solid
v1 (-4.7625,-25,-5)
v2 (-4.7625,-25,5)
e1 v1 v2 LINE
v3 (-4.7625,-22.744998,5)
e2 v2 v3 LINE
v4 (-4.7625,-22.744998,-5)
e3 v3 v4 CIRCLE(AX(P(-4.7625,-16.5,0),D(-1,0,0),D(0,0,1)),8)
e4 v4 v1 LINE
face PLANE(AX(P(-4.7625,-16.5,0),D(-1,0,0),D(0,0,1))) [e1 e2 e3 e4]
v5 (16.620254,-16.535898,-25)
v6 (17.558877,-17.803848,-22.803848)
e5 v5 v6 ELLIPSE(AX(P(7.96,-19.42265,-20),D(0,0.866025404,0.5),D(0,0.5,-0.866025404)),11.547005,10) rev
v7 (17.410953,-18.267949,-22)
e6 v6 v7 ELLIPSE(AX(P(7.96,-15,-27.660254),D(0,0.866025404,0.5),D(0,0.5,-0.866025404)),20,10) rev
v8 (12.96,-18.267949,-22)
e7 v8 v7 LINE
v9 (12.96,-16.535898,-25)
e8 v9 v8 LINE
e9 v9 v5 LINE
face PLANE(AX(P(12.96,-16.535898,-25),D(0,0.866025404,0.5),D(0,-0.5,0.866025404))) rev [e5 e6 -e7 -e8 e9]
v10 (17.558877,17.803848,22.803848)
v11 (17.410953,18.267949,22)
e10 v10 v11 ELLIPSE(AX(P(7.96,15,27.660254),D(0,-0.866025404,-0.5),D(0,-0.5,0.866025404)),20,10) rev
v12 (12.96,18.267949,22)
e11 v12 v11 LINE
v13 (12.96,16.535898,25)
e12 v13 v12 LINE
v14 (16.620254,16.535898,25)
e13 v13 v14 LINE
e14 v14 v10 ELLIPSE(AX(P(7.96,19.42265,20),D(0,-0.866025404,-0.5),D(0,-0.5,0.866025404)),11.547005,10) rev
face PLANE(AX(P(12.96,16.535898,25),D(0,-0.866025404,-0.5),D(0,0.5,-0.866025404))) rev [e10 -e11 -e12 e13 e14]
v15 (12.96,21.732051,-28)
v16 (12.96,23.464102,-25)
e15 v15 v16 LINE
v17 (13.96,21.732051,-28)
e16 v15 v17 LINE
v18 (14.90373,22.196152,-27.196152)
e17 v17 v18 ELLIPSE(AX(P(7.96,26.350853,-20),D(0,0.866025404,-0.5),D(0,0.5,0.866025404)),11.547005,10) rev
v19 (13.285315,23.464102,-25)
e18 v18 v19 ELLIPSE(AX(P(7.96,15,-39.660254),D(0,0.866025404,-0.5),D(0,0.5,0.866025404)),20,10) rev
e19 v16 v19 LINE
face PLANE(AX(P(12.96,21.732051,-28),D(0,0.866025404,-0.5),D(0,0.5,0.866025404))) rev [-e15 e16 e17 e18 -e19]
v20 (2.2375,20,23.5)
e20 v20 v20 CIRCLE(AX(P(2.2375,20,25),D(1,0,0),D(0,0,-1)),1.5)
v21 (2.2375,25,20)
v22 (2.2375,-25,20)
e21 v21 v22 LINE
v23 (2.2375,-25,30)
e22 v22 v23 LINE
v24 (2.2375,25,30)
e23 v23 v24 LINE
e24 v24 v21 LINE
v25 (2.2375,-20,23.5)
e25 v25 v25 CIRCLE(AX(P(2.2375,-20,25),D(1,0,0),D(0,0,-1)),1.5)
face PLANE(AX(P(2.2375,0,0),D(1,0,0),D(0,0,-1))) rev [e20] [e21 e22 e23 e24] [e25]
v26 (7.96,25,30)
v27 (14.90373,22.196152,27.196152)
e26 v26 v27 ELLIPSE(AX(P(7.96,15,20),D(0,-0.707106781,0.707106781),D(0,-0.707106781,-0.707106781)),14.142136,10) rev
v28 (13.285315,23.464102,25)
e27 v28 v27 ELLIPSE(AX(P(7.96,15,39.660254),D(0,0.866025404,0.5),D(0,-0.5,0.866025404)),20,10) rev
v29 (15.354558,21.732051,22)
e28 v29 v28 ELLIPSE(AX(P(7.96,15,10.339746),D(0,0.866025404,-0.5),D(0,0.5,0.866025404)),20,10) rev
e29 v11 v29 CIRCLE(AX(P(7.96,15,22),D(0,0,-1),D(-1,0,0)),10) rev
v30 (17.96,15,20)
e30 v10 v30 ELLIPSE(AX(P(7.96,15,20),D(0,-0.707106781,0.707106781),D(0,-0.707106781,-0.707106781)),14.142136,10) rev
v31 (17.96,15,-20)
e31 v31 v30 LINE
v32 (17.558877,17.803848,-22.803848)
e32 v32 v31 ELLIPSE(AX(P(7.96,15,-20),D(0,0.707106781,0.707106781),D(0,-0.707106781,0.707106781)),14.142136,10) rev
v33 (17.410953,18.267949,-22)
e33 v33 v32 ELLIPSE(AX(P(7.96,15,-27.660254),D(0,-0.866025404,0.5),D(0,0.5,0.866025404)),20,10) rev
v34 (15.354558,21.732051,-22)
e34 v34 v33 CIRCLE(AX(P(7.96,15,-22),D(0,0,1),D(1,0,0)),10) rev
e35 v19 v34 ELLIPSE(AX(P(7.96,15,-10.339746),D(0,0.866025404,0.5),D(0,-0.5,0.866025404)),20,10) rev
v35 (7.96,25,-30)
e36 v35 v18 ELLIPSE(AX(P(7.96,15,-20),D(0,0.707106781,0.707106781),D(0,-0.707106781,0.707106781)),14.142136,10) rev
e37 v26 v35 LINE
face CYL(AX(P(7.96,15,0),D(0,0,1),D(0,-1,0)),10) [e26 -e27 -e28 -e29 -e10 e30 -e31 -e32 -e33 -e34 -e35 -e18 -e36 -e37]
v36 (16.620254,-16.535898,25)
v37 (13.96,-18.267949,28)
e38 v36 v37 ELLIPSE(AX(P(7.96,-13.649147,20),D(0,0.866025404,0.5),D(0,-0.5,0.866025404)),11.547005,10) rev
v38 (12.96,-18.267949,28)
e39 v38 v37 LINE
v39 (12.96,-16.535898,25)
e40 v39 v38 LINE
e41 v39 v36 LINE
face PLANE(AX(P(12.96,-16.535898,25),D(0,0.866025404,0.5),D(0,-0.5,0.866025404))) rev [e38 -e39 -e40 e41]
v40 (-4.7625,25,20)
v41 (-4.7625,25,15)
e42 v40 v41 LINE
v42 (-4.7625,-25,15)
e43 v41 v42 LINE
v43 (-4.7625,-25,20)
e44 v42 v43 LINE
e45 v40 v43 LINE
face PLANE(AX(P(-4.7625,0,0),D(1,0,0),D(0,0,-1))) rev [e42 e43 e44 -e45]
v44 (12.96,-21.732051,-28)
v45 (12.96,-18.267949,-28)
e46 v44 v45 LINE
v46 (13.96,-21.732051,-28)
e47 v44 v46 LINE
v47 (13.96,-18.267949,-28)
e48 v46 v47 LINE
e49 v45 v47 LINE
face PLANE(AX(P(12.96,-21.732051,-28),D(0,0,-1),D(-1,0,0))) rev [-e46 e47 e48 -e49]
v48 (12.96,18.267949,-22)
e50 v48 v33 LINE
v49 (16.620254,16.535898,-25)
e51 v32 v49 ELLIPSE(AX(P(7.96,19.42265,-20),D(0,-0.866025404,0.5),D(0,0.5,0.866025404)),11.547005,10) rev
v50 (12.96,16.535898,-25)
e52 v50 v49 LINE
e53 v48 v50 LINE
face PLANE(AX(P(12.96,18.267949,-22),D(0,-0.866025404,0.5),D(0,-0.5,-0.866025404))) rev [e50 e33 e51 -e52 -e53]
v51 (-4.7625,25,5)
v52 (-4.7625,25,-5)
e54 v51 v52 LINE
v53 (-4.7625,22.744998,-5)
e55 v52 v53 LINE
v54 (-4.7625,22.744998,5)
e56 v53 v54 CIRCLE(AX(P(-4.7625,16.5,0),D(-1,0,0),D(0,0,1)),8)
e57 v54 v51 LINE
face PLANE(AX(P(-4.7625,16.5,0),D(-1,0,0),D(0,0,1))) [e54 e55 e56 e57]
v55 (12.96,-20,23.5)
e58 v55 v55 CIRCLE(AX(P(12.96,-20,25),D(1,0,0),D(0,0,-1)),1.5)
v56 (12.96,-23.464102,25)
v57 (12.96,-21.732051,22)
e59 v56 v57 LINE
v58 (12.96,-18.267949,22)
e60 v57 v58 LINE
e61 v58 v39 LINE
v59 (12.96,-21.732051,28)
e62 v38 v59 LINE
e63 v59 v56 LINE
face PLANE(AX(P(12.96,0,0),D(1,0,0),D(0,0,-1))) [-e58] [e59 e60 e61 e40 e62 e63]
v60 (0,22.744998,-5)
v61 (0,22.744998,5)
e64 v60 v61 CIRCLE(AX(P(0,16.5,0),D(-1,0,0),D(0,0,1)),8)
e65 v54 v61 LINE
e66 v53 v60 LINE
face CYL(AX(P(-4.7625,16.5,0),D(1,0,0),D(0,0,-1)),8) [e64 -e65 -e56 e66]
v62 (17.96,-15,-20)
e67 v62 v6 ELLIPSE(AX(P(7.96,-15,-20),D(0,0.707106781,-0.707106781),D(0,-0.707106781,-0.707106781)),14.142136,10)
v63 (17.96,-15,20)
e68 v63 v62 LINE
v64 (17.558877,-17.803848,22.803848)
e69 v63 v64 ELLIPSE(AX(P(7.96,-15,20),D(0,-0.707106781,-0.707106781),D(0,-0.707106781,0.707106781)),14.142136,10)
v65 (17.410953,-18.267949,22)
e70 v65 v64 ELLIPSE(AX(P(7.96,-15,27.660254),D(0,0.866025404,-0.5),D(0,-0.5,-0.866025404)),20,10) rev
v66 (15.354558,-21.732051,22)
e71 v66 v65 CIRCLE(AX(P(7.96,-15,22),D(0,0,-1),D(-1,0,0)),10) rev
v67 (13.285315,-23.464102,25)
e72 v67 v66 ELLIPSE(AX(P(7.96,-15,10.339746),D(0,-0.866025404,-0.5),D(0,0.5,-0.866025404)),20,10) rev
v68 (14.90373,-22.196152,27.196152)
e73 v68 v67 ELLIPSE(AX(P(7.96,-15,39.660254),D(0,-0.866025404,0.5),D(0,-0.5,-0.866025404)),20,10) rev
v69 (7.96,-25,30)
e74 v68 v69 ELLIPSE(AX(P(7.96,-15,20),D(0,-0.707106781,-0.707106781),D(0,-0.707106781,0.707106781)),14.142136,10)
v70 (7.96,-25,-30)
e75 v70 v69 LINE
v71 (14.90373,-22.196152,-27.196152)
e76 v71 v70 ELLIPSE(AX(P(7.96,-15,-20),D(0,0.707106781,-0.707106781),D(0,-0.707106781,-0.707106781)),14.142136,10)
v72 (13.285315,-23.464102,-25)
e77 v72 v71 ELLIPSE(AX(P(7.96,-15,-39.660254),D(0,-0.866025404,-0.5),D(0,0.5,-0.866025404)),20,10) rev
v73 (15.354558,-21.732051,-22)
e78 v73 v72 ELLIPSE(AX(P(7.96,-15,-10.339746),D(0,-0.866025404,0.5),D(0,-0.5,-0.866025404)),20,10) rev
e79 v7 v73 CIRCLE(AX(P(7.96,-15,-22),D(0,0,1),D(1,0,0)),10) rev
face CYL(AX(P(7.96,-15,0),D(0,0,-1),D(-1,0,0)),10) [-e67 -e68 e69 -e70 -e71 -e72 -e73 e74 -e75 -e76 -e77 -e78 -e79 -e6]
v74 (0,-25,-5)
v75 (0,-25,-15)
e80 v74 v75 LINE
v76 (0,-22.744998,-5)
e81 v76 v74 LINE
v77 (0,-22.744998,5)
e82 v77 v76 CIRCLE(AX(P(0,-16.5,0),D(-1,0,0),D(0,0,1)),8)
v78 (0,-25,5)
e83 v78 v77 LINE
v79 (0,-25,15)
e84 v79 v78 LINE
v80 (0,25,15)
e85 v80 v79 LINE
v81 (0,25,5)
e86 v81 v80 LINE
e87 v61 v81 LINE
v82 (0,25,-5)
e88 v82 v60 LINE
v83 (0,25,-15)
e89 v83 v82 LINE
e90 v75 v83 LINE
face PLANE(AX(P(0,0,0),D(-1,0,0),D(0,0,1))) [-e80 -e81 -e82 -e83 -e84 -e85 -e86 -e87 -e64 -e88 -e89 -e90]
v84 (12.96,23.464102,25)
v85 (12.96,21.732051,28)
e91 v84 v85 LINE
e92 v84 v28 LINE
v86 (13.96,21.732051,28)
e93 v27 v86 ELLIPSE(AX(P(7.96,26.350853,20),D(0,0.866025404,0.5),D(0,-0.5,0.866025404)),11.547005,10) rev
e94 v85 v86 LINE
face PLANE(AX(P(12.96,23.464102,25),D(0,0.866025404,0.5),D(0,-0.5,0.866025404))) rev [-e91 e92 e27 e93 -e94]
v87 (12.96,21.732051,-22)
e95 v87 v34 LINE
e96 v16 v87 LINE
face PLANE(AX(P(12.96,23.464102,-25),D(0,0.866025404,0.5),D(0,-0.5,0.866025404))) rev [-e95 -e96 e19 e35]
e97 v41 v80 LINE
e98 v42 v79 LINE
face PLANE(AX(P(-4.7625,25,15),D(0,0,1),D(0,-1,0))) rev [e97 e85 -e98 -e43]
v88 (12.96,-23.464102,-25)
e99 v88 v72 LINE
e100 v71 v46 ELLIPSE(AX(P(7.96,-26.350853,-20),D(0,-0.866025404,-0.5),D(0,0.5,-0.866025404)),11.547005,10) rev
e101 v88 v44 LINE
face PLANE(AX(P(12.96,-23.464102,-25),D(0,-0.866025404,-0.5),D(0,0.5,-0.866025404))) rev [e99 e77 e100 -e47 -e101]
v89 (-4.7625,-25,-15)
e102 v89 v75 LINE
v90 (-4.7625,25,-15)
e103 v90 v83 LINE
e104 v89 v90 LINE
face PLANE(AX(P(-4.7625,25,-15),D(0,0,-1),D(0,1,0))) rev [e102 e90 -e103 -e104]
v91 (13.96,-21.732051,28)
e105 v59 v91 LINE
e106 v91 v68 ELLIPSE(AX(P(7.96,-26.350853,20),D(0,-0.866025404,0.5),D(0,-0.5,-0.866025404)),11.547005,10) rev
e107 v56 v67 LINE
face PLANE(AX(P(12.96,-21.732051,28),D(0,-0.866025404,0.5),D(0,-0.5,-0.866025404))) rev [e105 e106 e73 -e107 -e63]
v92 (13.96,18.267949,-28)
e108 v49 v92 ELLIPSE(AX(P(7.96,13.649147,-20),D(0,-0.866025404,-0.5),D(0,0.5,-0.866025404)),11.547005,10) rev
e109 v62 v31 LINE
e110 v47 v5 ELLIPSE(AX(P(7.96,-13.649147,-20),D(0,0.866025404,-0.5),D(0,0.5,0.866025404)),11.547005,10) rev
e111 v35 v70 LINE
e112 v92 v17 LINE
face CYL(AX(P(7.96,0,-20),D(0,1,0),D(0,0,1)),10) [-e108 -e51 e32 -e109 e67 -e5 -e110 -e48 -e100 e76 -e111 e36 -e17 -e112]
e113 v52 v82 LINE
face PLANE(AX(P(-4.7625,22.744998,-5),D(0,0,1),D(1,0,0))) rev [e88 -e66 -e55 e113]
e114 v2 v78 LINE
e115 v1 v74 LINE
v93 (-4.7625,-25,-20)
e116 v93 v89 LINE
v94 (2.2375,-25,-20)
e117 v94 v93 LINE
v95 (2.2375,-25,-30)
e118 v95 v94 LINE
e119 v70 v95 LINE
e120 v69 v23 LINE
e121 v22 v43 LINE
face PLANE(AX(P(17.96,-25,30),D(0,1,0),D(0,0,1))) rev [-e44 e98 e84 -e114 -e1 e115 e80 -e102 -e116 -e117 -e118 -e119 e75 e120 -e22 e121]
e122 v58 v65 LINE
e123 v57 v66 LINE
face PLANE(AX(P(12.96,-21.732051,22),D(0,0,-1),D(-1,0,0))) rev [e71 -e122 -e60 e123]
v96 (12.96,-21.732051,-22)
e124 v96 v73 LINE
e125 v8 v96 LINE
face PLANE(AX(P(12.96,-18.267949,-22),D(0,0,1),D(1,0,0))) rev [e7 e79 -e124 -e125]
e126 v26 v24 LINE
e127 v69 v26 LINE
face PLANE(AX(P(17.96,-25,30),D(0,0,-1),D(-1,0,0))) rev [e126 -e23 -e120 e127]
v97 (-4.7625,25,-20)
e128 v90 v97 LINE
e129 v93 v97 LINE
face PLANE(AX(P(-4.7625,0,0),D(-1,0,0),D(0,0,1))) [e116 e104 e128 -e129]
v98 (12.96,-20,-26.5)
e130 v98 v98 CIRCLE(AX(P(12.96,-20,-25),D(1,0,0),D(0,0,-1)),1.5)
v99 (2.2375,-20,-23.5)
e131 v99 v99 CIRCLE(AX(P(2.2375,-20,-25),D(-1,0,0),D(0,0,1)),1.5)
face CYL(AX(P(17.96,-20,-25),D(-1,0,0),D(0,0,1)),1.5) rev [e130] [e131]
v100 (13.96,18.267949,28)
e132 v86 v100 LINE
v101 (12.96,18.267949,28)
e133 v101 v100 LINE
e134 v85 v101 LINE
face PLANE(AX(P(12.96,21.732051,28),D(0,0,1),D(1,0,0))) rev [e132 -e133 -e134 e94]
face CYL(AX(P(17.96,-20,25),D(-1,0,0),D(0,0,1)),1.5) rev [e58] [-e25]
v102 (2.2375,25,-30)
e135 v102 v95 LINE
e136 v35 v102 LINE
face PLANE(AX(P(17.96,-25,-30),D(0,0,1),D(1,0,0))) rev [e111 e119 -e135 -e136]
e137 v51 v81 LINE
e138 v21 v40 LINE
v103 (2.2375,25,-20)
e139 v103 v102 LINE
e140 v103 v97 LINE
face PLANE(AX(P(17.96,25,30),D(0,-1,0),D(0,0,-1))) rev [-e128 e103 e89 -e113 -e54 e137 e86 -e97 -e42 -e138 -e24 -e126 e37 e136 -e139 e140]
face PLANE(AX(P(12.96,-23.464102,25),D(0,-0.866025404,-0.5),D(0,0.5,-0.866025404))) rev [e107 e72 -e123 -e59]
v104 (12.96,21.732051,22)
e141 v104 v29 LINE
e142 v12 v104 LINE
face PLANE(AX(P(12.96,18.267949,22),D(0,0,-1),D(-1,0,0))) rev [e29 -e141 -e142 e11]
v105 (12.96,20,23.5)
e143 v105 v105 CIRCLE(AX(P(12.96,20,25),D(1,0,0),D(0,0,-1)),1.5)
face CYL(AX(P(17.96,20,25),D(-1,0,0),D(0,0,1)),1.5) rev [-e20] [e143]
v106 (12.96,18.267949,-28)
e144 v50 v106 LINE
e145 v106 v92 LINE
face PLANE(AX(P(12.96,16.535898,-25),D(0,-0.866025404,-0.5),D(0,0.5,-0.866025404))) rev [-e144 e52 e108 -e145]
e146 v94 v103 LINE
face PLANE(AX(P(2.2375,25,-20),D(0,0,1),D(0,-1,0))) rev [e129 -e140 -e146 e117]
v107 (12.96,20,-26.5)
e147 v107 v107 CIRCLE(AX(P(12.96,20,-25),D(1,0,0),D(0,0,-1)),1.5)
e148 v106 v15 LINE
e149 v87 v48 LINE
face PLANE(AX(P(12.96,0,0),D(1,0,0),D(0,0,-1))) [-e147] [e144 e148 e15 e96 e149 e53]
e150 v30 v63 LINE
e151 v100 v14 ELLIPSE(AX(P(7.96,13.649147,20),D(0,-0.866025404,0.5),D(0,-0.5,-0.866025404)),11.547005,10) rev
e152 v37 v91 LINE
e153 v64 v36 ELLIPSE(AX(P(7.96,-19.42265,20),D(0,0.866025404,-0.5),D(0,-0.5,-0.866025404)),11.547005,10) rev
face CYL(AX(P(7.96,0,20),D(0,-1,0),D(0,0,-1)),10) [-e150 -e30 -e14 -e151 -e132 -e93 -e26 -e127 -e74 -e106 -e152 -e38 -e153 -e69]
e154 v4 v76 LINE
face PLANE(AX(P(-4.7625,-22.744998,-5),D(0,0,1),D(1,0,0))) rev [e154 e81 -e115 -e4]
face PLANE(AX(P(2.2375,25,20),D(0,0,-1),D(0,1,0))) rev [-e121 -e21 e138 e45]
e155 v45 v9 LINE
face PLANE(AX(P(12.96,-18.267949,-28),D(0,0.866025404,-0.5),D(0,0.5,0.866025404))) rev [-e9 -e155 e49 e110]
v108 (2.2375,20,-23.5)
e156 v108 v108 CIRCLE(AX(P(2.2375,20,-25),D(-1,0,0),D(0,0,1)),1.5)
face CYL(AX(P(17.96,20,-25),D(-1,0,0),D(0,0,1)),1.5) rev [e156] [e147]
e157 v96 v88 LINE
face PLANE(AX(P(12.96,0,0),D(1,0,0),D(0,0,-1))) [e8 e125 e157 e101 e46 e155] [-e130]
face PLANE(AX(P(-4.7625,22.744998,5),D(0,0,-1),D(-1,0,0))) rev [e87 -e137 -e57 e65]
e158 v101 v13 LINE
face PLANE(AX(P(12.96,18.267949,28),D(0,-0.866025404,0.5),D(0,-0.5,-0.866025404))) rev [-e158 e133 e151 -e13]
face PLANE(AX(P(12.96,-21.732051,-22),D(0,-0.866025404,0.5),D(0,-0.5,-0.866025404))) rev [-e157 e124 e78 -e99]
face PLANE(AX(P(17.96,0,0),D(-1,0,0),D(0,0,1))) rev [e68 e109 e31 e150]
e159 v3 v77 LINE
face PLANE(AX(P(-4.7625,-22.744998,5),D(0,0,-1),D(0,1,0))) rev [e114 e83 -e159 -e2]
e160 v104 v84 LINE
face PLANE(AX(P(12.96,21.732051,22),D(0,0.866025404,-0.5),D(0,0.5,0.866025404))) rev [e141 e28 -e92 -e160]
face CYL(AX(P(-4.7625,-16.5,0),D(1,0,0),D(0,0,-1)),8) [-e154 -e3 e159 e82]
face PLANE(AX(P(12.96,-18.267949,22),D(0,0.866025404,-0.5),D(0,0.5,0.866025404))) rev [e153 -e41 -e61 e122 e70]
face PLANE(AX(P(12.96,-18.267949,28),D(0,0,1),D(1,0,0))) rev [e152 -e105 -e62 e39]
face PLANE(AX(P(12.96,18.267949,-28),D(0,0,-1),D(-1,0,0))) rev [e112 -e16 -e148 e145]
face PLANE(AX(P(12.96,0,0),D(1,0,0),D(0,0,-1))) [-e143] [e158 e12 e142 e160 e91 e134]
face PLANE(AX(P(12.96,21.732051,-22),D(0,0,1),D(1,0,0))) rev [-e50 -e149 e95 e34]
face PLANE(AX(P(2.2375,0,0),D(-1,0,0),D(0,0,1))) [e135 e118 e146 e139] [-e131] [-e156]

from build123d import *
from build123d.topology import SkipClean

# Parameters (mm, degrees)
CROQUIS1_W              = 60
CROQUIS1_H              = 50
CROQUIS1_R              = 1.5
SALIENTE_EXTRUIR1_DEPTH = 17.96
SALIENTE_EXTRUIR2_START = 4.7625
CROQUIS3_W              = 15
CROQUIS3_H              = 50
CROQUIS3_R              = 1.5
SALIENTE_EXTRUIR2_DEPTH = 4.7625
SALIENTE_EXTRUIR3_DEPTH = 4.7625
REDONDEO2_R             = 10
CORTAR_EXTRUIR1_DEPTH   = 5
CROQUIS6_W              = 10
CROQUIS6_H              = 50
CORTAR_EXTRUIR2_DEPTH   = 7


with BuildPart() as part:
    # Croquis1 → Saliente-Extruir1 (new body)
    with BuildSketch(Plane(origin=(0, 0, 0), x_dir=(0, 0, -1), z_dir=(1, 0, 0))):
        Rectangle(CROQUIS1_W, CROQUIS1_H)
        with Locations((-25, 20)):
            Circle(CROQUIS1_R, mode=Mode.SUBTRACT)
        with Locations(Location((25, 20, 0), (0, 0, 180))):
            Circle(CROQUIS1_R, mode=Mode.SUBTRACT)
        with Locations((25, -20)):
            Circle(CROQUIS1_R, mode=Mode.SUBTRACT)
        with Locations(Location((-25, -20, 0), (0, 0, 180))):
            Circle(CROQUIS1_R, mode=Mode.SUBTRACT)
    extrude(amount=SALIENTE_EXTRUIR1_DEPTH)

    # Croquis3 → Saliente-Extruir2 (add)
    # profile 1 of 2: a face of its own
    with SkipClean():  # the faces are left unmerged after this step: merging them gives an invalid solid
        with BuildSketch(Plane.ZY.offset(SALIENTE_EXTRUIR2_START)):
            with Locations((-22.5, 0)):
                Rectangle(CROQUIS3_W, CROQUIS3_H)
            with Locations((-25, -20)):
                Circle(CROQUIS3_R, mode=Mode.SUBTRACT)
            with Locations((-25, 20)):
                Circle(CROQUIS3_R, mode=Mode.SUBTRACT)
        # profile 2 of 2: a face of its own
        with BuildSketch(Plane.ZY.offset(SALIENTE_EXTRUIR2_START)):
            with Locations((22.5, 0)):
                Rectangle(CROQUIS3_W, CROQUIS3_H)
            with Locations((25, -20)):
                Circle(CROQUIS3_R, mode=Mode.SUBTRACT)
            with Locations((25, 20)):
                Circle(CROQUIS3_R, mode=Mode.SUBTRACT)
        extrude(amount=-SALIENTE_EXTRUIR2_DEPTH)

    # Croquis4 → Saliente-Extruir3 (add)
    with SkipClean():  # the faces are left unmerged after this step: merging them gives an invalid solid
        with BuildSketch(Plane.ZY):
            with BuildLine():
                Line((-5, 22.744997998), (-5, 25))
                Line((-5, 25), (5, 25))
                Line((5, 25), (5, 22.744997998))
                ThreePointArc((5, 22.744997998), (0, 8.5), (-5, 22.744997998))
            make_face()
            with BuildLine():
                Line((-5, -22.744997998), (-5, -25))
                Line((-5, -25), (5, -25))
                Line((5, -25), (5, -22.744997998))
                ThreePointArc((5, -22.744997998), (0, -8.5), (-5, -22.744997998))
            make_face()
        extrude(amount=SALIENTE_EXTRUIR3_DEPTH)

    # Redondeo2
    # the kernel refuses this fillet: 10 mm, written as the material it takes off along each edge
    with BuildSketch(Plane(origin=(17.96, -50, -30), x_dir=(-1, 0, 0), z_dir=(0, 1, 0)), Plane(origin=(17.96, 50, 30), x_dir=(-1, 0, 0), z_dir=(0, -1, 0))) as redondeo2_piece_1:
        with BuildLine():
            CenterArc((REDONDEO2_R, REDONDEO2_R), REDONDEO2_R, 180, 90)
            Line((0, REDONDEO2_R), (0, 0))
            Line((0, 0), (REDONDEO2_R, 0))
        make_face()
    extrude(amount=100, mode=Mode.SUBTRACT)
    with BuildSketch(Plane(origin=(17.96, 25, -55), x_dir=(0, -1, 0), z_dir=(0, 0, 1))) as redondeo2_piece_2:
        with BuildLine():
            CenterArc((REDONDEO2_R, -REDONDEO2_R), REDONDEO2_R, 90, 90)
            Line((0, -REDONDEO2_R), (0, 0))
            Line((0, 0), (REDONDEO2_R, 0))
        make_face()
    extrude(amount=110, mode=Mode.SUBTRACT)
    with BuildSketch(Plane(origin=(17.96, -25, 55), x_dir=(-1, 0, 0), z_dir=(0, 0, -1))) as redondeo2_piece_3:
        with BuildLine():
            CenterArc((REDONDEO2_R, REDONDEO2_R), REDONDEO2_R, 180, 90)
            Line((0, REDONDEO2_R), (0, 0))
            Line((0, 0), (REDONDEO2_R, 0))
        make_face()
    extrude(amount=110, mode=Mode.SUBTRACT)

    # Croquis5 → Cortar-Extruir1 (cut)
    with BuildSketch(Plane(origin=(17.96, 0, 0), x_dir=(0, 0, -1), z_dir=(1, 0, 0))):
        Polygon((-25, 23.464101615), (-28, 21.732050808), (-28, 18.267949192), (-25, 16.535898385), (-22, 18.267949192), (-22, 21.732050808), align=None)
        Polygon((25, 23.464101615), (22, 21.732050808), (22, 18.267949192), (25, 16.535898385), (28, 18.267949192), (28, 21.732050808), align=None)
        Polygon((25, -16.535898385), (22, -18.267949192), (22, -21.732050808), (25, -23.464101615), (28, -21.732050808), (28, -18.267949192), align=None)
        Polygon((-25, -16.535898385), (-28, -18.267949192), (-28, -21.732050808), (-25, -23.464101615), (-22, -21.732050808), (-22, -18.267949192), align=None)
    extrude(amount=-CORTAR_EXTRUIR1_DEPTH, mode=Mode.SUBTRACT)

    # Croquis6 → Cortar-Extruir2 (cut)
    with BuildSketch(Plane.ZY.offset(4.7625)):
        with Locations((25, 0)):
            Rectangle(CROQUIS6_W, CROQUIS6_H)
        with Locations((-25, 0)):
            Rectangle(CROQUIS6_W, CROQUIS6_H)
    extrude(amount=-CORTAR_EXTRUIR2_DEPTH, mode=Mode.SUBTRACT)


solid = part.part
